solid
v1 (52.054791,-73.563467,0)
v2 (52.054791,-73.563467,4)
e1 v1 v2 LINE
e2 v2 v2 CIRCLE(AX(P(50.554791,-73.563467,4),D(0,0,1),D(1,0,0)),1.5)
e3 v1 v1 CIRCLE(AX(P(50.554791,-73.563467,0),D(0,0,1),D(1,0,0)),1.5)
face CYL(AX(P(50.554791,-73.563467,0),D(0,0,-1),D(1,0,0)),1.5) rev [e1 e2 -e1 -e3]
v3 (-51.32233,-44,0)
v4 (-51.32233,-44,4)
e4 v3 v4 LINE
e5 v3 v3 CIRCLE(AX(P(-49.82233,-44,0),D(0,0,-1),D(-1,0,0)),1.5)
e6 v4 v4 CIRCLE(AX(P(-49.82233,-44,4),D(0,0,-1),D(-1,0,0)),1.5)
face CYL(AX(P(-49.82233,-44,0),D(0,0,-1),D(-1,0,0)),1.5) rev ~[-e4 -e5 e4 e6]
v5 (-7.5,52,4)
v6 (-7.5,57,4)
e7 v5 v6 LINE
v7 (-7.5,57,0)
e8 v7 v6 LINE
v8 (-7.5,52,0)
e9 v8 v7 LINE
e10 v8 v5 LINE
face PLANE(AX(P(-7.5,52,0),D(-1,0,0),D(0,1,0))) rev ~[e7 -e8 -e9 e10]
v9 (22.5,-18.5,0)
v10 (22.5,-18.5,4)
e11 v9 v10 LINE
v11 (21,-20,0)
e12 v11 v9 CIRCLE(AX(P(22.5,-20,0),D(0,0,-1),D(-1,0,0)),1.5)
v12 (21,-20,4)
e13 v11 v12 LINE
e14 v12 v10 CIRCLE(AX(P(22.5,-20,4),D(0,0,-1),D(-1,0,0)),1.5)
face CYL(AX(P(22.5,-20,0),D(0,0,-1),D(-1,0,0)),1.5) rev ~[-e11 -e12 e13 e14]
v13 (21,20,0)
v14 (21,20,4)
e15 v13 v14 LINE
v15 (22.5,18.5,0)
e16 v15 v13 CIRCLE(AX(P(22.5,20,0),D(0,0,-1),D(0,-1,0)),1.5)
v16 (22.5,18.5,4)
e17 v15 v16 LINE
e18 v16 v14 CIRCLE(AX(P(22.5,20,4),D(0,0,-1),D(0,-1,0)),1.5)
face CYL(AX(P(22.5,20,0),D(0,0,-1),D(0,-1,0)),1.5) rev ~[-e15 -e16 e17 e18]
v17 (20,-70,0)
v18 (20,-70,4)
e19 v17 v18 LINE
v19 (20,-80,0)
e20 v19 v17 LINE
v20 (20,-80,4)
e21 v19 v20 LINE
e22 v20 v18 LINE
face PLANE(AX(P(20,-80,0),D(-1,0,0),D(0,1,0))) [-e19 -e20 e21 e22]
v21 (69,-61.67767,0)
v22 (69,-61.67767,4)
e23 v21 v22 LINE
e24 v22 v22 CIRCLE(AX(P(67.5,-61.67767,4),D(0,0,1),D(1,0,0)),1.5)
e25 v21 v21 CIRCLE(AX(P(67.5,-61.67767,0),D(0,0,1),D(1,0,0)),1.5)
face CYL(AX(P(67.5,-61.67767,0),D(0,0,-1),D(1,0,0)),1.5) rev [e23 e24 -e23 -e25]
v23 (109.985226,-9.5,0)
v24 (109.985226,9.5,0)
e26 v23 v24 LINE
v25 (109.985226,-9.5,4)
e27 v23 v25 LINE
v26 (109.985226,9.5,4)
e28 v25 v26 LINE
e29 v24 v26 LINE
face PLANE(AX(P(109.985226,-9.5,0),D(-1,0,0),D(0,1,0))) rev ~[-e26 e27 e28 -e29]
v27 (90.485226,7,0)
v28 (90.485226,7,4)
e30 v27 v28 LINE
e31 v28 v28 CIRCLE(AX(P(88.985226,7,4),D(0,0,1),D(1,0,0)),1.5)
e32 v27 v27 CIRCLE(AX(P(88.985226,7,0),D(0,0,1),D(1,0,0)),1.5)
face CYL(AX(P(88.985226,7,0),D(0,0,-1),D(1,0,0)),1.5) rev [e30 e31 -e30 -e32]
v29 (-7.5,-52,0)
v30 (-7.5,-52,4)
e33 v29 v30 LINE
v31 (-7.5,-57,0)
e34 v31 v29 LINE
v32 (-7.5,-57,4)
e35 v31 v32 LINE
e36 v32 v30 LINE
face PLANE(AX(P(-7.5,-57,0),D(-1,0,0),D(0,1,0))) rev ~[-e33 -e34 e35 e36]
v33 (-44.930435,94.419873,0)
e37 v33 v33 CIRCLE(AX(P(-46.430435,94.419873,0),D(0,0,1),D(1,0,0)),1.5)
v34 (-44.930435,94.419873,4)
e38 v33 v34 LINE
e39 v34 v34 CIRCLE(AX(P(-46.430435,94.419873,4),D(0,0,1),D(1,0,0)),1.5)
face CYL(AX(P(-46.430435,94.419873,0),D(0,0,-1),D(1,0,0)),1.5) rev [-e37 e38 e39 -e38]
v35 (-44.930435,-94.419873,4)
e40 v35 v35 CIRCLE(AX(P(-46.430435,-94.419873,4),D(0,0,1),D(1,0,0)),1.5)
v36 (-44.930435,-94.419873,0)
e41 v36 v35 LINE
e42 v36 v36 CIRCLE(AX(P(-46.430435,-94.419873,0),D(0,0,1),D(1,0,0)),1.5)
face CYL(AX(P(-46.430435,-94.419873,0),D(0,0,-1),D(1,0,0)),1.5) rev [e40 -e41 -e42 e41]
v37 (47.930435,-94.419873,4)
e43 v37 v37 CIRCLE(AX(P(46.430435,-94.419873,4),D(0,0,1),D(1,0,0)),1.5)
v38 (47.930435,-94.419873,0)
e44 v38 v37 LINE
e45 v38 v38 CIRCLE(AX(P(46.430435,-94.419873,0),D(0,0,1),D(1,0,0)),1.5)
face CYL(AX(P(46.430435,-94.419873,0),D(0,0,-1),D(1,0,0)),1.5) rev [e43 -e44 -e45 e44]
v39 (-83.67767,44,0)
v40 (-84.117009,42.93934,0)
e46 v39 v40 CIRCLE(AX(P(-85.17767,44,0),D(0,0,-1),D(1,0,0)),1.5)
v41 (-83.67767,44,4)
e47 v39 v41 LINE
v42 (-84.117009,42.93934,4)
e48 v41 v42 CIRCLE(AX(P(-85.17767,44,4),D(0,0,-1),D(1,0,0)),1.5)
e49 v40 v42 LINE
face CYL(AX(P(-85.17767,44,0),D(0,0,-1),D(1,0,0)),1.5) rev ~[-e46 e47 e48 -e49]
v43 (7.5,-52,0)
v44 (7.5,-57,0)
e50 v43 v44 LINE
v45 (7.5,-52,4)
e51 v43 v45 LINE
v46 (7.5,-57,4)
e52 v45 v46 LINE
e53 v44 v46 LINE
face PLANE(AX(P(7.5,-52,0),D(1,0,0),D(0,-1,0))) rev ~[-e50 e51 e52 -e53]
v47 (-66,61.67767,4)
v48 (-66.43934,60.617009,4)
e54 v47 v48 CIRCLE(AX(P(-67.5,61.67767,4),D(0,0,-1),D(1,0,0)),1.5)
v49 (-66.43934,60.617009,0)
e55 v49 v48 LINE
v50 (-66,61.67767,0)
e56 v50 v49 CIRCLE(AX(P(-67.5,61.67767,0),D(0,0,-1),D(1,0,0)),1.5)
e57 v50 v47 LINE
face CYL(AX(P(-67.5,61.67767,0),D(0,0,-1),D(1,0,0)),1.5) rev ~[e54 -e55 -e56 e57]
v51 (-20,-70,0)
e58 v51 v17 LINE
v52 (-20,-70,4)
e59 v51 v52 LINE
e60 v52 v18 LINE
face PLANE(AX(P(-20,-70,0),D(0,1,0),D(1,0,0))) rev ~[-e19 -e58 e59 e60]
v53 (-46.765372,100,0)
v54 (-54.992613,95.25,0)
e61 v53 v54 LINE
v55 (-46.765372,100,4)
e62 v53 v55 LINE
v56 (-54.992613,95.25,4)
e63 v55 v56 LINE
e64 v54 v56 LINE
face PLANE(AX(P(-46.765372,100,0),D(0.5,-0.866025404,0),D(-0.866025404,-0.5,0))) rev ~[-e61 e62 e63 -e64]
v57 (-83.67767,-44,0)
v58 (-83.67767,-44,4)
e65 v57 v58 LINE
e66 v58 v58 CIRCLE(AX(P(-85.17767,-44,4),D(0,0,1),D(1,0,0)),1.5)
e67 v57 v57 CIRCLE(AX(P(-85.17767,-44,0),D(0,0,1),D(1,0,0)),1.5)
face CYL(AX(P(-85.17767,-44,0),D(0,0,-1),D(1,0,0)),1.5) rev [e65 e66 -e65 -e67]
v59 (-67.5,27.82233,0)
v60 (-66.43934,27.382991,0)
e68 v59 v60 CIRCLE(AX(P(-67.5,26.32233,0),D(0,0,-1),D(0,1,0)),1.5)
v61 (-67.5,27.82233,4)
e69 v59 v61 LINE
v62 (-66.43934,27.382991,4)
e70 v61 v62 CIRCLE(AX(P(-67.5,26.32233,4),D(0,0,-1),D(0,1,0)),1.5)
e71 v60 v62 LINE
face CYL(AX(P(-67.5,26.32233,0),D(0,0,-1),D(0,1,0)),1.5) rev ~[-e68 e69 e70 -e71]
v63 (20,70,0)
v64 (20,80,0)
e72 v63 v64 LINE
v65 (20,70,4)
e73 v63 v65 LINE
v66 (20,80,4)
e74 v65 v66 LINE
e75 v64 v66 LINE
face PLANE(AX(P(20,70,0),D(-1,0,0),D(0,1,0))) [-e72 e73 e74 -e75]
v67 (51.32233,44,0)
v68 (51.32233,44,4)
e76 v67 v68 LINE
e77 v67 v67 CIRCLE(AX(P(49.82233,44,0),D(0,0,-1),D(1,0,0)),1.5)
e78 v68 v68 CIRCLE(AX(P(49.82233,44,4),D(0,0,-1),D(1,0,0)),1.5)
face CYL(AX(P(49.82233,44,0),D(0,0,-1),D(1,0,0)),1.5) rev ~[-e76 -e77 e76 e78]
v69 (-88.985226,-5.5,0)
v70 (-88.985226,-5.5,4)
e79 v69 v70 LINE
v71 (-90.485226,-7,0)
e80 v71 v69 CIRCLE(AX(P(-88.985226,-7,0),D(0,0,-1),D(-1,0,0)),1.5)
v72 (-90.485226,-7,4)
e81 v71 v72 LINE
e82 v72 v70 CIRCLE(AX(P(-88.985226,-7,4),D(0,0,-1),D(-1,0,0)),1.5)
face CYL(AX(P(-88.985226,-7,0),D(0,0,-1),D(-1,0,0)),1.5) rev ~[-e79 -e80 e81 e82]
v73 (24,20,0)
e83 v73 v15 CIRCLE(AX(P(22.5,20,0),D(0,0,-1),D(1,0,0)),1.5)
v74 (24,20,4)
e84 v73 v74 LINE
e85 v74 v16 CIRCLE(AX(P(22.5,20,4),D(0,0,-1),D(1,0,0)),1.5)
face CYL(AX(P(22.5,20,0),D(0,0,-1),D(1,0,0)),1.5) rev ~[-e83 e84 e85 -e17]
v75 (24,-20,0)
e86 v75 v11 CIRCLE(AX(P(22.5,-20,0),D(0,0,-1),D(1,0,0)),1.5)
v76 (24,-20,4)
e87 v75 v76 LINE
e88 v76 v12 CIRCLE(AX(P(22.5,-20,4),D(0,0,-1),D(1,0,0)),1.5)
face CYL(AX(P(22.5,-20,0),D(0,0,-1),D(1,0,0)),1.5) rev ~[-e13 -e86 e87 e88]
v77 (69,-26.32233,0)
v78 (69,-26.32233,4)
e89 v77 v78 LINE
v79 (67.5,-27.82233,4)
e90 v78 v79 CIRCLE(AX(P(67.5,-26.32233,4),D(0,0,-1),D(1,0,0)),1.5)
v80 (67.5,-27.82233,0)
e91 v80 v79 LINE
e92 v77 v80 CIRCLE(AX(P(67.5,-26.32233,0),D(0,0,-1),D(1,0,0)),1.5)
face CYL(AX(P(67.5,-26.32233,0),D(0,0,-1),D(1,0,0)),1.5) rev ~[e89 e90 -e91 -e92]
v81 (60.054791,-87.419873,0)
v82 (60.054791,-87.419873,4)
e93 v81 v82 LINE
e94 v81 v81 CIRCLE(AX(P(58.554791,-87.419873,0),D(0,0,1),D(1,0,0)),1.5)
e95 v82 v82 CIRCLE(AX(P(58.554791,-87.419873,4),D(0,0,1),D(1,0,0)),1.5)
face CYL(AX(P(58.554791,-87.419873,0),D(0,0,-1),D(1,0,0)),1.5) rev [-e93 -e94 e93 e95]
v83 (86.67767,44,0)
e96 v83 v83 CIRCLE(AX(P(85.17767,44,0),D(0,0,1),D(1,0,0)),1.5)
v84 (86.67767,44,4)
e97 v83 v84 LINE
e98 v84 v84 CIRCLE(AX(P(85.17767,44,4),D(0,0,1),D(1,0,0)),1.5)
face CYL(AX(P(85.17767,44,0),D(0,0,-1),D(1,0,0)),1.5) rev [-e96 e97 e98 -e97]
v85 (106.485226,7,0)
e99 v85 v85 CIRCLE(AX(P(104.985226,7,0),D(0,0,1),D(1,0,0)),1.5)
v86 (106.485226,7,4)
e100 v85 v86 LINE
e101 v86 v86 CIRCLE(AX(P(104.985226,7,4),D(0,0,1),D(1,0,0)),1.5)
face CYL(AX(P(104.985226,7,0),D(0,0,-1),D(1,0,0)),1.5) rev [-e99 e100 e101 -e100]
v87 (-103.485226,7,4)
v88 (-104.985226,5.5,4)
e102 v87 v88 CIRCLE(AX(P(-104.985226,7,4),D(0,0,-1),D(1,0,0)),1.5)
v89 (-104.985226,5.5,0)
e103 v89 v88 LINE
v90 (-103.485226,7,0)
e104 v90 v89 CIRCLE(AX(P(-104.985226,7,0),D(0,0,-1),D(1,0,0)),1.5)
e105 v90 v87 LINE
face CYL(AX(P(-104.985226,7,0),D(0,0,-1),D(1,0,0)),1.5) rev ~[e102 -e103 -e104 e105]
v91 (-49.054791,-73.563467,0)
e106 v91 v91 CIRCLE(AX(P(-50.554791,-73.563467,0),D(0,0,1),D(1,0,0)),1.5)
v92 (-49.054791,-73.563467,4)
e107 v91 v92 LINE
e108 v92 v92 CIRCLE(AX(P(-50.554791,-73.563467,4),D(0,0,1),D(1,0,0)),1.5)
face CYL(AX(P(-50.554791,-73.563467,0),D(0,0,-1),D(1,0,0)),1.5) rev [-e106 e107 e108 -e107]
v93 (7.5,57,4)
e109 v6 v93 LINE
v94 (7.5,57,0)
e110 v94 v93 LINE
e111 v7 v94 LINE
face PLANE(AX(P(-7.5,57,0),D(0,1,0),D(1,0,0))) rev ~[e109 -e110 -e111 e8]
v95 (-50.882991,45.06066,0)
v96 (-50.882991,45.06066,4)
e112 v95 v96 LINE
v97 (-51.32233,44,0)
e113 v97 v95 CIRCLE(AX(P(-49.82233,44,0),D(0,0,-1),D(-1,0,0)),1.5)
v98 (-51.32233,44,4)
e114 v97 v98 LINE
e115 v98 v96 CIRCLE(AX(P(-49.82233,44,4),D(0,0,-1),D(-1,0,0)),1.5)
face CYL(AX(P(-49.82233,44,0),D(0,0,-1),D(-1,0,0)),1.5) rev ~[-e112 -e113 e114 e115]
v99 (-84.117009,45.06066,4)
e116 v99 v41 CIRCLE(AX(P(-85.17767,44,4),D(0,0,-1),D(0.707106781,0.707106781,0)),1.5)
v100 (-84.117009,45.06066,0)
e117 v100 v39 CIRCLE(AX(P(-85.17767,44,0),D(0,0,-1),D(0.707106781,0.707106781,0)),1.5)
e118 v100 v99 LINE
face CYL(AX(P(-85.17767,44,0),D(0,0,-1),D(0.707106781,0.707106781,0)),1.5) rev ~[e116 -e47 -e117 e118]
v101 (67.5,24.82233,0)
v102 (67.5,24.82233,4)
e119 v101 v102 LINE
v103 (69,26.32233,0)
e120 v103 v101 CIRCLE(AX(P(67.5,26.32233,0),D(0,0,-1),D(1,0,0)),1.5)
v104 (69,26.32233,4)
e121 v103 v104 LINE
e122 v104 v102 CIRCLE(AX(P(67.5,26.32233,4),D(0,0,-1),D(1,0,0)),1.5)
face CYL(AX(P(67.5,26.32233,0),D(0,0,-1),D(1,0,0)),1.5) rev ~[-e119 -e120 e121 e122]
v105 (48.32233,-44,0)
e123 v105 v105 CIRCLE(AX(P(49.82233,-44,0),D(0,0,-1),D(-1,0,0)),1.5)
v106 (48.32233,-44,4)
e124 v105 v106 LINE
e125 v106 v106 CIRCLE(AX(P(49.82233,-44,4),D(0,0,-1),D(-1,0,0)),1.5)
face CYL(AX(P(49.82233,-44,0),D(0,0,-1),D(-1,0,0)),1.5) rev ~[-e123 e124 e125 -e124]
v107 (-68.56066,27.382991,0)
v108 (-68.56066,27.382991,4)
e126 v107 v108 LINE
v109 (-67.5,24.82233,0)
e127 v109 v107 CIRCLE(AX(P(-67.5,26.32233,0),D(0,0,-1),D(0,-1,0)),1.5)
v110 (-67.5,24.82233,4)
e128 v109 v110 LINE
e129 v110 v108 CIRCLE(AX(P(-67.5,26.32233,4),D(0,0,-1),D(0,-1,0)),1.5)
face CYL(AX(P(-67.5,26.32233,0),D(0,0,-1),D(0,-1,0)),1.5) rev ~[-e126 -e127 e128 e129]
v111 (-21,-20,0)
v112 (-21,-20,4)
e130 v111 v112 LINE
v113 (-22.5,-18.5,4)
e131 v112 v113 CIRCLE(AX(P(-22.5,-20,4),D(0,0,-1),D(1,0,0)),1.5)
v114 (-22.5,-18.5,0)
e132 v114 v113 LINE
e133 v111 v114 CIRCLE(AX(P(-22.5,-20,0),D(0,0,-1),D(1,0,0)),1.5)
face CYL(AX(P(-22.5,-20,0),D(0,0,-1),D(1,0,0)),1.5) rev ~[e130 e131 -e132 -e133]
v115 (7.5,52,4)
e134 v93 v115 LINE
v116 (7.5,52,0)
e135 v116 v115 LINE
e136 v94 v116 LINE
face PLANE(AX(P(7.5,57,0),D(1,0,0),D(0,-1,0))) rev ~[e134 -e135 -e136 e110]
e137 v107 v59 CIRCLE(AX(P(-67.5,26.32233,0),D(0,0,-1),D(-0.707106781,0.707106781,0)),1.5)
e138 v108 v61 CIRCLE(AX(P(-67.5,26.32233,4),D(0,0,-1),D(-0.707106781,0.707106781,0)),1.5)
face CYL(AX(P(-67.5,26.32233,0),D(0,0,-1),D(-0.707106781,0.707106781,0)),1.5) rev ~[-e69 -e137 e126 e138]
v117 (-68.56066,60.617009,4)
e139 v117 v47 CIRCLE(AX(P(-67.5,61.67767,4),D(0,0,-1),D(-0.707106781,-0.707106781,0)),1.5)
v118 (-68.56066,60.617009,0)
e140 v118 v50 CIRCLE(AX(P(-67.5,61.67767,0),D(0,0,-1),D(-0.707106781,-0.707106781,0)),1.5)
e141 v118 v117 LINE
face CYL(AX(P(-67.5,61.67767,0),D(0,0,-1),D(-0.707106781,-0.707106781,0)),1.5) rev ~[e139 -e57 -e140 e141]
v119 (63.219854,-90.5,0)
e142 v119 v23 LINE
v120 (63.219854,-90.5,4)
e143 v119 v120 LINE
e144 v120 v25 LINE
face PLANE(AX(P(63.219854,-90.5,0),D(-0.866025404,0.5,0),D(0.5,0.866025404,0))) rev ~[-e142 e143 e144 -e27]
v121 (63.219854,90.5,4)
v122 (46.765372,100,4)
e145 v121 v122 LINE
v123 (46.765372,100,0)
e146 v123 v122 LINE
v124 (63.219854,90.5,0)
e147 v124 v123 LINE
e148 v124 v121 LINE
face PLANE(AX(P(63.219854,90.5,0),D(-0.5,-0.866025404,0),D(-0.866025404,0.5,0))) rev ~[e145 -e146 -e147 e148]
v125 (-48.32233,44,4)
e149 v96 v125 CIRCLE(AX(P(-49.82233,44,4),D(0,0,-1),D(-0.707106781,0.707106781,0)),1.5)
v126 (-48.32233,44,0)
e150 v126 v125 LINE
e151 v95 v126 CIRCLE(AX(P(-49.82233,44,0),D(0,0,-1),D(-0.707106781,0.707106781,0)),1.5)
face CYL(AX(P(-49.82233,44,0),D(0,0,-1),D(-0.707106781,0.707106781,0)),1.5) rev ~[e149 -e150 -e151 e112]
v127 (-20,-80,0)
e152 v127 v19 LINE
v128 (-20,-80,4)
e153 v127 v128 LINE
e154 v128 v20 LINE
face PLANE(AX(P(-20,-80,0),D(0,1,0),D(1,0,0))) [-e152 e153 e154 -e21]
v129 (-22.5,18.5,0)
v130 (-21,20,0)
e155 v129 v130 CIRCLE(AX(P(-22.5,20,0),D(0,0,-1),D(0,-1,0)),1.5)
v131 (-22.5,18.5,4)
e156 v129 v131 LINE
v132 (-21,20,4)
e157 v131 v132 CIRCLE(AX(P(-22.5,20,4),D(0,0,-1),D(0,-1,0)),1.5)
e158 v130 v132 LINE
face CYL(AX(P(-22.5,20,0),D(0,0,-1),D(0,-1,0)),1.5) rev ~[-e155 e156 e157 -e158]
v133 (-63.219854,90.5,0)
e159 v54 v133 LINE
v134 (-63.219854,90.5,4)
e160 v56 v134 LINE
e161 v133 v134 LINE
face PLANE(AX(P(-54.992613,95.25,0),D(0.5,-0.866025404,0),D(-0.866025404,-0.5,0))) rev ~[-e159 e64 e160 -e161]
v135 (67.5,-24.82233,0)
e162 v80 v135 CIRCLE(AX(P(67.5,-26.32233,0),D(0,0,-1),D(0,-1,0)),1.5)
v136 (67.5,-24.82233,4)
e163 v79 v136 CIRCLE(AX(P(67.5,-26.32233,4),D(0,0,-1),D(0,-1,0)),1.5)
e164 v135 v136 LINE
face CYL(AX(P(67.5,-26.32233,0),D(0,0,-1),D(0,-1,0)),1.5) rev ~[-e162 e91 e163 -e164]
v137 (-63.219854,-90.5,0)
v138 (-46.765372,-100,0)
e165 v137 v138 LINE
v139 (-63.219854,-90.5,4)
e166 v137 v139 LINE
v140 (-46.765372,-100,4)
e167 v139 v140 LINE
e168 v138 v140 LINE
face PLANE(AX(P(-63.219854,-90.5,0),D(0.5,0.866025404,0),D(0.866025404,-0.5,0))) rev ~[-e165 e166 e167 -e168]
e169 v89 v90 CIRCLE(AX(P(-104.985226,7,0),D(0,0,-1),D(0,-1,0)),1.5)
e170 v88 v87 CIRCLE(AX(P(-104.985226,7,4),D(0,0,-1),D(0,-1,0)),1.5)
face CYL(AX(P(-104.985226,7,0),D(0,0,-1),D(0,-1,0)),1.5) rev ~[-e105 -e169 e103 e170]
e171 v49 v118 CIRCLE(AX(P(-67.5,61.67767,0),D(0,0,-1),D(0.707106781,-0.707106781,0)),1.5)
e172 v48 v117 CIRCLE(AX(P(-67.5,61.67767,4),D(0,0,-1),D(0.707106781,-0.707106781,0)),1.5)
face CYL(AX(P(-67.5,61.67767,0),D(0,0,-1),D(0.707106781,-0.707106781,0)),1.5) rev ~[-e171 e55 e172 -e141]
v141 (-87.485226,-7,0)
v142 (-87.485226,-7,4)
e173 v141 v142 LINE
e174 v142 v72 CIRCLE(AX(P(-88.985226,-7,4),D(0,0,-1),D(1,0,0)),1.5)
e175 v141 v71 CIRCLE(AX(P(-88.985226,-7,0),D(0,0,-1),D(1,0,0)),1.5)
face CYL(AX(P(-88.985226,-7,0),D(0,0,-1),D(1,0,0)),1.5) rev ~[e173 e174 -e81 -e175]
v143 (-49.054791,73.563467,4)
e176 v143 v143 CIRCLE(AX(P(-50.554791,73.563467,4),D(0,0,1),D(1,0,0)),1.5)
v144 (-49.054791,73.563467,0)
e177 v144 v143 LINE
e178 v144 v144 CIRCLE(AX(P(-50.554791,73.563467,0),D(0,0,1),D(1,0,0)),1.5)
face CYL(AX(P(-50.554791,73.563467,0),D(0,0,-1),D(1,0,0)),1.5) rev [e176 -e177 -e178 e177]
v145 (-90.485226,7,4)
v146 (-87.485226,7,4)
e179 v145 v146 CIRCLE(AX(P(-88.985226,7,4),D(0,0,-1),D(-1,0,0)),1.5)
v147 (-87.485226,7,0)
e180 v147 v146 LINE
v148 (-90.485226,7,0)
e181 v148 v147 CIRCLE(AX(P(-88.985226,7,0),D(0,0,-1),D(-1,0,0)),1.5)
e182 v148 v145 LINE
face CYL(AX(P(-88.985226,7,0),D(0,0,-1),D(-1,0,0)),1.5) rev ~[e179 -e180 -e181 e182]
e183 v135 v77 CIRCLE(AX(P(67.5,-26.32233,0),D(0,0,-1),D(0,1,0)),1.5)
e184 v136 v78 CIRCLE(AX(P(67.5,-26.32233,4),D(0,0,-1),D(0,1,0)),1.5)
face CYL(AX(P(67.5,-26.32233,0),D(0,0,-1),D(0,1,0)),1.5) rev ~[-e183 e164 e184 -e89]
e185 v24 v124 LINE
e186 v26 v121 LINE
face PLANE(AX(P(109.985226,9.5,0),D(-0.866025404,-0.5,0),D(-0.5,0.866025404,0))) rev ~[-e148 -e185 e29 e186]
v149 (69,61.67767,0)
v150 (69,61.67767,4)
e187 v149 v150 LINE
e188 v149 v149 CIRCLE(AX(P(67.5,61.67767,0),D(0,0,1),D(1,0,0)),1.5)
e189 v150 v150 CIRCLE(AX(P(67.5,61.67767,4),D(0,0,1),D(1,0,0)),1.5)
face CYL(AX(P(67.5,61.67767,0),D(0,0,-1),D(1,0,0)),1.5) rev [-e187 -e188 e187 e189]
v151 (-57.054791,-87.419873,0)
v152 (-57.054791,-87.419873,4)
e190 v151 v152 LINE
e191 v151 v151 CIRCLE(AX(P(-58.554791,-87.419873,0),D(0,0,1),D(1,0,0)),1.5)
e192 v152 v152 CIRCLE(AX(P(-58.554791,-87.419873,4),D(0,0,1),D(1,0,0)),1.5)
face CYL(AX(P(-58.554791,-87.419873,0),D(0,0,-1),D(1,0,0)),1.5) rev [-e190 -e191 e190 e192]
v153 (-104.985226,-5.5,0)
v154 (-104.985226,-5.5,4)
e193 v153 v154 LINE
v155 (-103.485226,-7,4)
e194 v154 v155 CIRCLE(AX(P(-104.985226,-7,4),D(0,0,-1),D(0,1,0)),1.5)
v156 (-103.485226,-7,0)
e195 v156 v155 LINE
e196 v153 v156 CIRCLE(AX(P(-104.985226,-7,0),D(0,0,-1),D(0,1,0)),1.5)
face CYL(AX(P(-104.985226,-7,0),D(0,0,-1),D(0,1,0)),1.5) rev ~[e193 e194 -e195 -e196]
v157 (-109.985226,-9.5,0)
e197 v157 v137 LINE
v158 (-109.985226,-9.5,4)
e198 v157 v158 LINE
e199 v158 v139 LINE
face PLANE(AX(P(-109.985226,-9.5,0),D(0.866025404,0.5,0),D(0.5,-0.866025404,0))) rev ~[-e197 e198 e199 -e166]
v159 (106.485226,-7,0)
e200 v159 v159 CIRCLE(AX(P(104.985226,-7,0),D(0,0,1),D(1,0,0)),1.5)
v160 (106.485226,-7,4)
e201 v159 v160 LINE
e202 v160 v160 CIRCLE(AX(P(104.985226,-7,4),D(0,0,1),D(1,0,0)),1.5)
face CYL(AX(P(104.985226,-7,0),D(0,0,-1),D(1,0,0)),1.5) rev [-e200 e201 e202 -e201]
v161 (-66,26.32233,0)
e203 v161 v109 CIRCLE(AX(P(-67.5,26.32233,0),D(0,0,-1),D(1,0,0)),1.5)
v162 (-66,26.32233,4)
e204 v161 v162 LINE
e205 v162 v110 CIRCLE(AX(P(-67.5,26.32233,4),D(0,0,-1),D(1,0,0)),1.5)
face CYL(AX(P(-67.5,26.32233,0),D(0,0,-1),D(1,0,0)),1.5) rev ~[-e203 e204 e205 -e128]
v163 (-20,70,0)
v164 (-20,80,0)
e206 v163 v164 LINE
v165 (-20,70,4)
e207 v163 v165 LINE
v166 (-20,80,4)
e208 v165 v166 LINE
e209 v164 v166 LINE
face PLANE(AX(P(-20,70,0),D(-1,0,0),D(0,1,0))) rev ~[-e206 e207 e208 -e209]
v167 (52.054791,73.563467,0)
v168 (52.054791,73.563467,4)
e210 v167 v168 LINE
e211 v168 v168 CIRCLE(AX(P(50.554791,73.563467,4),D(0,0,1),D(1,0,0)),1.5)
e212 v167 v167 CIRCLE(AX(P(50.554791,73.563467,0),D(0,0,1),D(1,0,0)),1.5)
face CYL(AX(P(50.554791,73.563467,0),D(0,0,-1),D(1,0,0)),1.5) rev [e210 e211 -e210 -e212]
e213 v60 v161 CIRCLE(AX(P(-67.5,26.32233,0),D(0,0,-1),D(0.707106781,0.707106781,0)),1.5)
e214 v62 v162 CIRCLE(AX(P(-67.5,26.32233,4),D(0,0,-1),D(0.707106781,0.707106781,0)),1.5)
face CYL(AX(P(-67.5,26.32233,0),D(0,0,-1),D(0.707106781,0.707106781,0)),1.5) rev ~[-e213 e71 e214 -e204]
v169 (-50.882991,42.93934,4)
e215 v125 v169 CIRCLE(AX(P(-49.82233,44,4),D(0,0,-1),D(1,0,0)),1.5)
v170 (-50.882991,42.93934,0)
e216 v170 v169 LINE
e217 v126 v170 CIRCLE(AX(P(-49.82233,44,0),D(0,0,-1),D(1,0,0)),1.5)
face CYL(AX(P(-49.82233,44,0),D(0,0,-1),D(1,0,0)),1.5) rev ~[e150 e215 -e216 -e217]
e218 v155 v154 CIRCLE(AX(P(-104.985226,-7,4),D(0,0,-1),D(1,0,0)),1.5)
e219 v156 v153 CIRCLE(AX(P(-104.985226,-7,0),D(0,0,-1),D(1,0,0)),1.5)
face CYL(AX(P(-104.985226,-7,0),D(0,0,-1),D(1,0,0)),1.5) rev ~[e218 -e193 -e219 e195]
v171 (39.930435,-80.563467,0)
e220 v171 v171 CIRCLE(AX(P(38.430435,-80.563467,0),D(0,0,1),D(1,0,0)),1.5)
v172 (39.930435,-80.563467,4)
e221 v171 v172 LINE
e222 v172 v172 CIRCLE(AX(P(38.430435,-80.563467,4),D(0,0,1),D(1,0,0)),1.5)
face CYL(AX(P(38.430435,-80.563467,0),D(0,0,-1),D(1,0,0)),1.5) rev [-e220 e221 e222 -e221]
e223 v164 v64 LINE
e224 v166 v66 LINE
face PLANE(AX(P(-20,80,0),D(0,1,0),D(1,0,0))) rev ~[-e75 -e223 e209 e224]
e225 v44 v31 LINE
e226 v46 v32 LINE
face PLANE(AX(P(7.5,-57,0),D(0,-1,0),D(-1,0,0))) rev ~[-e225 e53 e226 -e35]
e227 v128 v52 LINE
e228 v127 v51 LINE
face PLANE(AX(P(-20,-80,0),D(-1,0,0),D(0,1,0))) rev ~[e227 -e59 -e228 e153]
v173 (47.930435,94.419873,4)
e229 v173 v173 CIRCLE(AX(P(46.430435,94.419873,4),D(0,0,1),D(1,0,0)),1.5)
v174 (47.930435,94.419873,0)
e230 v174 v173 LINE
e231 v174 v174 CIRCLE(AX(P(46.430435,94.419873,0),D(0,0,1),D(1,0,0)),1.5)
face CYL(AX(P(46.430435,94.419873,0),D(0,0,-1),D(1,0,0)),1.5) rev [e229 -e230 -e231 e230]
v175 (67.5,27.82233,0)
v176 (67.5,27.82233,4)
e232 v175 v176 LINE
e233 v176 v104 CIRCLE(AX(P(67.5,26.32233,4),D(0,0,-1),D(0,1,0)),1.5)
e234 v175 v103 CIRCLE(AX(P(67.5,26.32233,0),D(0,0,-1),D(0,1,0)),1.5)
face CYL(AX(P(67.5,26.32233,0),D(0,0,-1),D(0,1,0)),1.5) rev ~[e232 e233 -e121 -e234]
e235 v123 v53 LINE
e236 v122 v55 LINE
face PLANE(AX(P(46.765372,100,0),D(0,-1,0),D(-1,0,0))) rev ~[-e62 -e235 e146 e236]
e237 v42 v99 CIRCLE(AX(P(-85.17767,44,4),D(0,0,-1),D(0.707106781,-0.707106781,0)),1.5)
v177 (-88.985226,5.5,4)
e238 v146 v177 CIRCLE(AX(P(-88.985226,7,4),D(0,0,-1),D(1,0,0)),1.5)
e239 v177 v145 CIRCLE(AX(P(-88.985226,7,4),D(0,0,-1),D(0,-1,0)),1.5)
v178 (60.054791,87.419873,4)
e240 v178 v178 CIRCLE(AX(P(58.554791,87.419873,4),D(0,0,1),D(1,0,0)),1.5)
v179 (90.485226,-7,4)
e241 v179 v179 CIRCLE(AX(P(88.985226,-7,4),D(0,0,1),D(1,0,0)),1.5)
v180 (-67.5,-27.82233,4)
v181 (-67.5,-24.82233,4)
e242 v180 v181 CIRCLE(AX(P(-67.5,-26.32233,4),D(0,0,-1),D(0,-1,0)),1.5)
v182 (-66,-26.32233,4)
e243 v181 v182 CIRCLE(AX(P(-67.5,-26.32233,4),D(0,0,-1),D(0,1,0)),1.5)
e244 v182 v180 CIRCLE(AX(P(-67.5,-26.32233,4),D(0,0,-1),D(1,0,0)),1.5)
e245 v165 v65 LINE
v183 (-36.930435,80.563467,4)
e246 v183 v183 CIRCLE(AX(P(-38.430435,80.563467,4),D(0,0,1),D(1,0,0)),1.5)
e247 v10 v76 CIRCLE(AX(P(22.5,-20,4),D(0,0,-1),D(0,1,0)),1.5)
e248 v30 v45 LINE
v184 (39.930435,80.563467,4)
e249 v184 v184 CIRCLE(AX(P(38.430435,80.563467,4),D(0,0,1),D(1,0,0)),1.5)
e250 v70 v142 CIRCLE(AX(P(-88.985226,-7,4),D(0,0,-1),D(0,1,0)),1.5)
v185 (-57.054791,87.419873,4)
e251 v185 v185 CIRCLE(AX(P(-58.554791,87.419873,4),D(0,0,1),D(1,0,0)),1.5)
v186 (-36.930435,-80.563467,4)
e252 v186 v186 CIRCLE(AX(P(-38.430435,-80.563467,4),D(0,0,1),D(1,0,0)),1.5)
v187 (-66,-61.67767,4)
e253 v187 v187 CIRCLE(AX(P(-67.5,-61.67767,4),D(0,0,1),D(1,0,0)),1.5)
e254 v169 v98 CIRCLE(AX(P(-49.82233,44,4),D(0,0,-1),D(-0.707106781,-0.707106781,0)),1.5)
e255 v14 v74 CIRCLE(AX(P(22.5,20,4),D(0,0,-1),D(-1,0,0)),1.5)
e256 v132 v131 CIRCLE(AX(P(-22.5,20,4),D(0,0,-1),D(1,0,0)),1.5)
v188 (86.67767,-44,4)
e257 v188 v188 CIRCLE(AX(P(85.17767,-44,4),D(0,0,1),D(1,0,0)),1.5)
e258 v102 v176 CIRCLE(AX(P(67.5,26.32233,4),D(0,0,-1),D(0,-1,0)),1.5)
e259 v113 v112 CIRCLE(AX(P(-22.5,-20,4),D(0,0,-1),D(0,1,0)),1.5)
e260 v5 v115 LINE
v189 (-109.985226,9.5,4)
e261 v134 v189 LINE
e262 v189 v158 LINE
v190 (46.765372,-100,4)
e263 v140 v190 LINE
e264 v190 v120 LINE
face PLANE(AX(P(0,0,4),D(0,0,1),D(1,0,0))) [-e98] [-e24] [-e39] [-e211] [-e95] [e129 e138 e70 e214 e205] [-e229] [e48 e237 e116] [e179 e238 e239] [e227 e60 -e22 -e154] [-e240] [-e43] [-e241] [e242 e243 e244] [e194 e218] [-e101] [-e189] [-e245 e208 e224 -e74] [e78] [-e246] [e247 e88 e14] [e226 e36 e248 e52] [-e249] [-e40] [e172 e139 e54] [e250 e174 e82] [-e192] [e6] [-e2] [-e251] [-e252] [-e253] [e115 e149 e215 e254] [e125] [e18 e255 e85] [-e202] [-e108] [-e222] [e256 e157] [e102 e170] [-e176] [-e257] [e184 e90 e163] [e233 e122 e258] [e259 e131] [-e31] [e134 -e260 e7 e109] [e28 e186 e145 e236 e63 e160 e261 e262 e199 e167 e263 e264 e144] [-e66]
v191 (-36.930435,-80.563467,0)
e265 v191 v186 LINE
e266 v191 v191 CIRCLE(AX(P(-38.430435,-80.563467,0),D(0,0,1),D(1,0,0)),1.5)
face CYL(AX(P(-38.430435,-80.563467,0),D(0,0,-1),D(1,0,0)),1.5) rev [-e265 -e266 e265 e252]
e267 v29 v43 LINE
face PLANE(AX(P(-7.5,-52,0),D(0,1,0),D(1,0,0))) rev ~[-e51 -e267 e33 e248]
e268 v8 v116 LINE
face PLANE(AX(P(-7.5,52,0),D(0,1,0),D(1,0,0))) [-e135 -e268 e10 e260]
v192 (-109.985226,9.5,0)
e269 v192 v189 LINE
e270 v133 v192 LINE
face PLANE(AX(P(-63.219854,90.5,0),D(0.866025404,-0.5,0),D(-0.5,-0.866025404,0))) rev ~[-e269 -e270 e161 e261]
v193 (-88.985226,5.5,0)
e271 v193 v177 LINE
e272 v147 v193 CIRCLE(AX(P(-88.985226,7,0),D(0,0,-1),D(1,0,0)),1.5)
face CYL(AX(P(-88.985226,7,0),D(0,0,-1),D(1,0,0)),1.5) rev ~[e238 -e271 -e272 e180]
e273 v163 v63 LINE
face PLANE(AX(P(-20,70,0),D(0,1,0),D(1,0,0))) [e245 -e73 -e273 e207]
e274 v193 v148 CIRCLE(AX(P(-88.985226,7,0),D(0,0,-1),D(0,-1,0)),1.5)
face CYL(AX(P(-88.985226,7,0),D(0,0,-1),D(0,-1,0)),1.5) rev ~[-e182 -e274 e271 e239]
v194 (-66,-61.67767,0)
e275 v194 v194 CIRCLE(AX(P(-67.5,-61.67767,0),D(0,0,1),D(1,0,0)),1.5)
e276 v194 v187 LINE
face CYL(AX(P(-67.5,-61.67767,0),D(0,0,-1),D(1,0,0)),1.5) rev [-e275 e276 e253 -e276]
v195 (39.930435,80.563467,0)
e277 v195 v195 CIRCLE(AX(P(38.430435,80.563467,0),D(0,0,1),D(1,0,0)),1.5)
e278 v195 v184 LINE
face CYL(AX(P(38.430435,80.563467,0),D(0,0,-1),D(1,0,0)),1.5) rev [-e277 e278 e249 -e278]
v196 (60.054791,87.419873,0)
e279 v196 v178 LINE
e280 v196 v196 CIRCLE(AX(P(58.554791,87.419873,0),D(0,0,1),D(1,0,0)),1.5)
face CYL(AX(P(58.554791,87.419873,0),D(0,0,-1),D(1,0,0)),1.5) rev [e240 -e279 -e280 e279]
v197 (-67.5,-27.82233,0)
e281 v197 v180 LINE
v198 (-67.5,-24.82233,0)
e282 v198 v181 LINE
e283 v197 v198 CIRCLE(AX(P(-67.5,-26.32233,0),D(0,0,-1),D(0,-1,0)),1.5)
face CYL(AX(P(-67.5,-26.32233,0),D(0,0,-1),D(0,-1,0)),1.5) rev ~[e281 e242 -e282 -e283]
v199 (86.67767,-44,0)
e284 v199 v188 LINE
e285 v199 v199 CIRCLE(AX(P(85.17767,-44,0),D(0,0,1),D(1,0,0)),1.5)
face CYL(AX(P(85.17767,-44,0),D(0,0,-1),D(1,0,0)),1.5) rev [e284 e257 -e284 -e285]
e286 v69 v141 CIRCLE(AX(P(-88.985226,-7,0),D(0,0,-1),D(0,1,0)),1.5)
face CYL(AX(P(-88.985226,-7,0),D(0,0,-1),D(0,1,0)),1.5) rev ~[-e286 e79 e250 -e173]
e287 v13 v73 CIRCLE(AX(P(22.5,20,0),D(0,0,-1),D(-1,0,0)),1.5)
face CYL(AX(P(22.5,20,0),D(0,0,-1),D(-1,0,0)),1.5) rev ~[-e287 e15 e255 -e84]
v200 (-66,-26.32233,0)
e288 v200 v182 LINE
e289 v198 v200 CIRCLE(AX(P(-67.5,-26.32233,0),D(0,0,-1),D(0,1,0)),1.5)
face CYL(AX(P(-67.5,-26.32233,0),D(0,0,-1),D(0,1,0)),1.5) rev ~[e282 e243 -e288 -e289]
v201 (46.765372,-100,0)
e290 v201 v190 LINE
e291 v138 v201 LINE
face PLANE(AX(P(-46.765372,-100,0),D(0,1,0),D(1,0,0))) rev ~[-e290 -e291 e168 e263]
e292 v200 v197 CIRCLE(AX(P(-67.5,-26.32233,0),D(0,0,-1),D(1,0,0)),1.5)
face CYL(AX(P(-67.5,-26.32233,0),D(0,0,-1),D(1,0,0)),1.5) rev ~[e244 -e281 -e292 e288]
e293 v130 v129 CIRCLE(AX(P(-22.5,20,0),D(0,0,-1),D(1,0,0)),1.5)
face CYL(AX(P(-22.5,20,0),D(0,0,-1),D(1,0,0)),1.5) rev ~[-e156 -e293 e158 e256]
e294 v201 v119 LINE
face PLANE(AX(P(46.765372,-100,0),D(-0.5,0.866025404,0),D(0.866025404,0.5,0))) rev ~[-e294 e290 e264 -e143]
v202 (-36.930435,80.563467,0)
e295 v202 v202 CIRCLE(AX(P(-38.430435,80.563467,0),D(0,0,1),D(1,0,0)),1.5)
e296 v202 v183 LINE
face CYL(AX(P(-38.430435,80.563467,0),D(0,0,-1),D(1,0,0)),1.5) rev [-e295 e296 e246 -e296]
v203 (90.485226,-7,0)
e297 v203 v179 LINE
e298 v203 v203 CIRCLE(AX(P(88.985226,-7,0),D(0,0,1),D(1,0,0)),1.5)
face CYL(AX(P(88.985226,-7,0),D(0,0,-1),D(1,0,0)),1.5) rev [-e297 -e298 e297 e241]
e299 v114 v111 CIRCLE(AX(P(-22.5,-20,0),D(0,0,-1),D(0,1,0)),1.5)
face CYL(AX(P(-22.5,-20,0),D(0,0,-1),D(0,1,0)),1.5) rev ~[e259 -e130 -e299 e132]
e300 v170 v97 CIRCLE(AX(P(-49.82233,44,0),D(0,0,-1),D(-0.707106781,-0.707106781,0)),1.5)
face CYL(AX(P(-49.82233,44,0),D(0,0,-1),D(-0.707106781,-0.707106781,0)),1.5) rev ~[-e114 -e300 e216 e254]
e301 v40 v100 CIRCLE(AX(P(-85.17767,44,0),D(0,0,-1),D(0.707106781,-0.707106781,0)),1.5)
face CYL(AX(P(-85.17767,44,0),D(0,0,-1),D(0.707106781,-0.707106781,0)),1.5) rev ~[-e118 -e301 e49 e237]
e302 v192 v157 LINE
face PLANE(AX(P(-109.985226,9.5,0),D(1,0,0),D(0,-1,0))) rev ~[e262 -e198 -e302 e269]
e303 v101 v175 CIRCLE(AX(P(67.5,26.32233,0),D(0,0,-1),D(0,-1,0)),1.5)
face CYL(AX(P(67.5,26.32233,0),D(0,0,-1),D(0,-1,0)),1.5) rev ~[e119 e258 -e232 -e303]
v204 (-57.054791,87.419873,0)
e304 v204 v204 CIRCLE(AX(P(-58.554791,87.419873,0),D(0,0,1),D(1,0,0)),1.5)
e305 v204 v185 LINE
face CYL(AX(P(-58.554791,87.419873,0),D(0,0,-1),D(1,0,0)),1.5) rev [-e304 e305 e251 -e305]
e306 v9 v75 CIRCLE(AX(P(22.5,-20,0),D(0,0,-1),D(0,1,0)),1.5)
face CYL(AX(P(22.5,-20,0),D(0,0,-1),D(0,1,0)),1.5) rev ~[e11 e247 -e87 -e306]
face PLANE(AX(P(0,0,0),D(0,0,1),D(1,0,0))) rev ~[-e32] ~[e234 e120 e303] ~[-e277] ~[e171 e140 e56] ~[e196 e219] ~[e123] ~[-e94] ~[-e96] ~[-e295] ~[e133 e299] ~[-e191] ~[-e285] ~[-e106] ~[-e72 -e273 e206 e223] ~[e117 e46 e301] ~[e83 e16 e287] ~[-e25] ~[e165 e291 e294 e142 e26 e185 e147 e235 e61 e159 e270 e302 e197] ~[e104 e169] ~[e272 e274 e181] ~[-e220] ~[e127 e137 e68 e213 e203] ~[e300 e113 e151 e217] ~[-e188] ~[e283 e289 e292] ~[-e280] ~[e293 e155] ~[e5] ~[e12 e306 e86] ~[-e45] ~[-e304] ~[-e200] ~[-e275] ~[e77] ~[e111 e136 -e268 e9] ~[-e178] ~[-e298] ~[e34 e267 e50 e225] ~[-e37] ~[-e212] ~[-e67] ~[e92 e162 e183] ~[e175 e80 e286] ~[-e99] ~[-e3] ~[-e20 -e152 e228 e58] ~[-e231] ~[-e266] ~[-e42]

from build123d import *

# Parameters (mm, degrees)
F0_R     = 1.5
F0_W     = 40
F0_H     = 10
F0_W_2   = 15
F0_H_2   = 5
F0_W_3   = 36
F0_H_3   = 40
F0_H_4   = 24
F1_DEPTH = 4


# Not quite as in the source:
# - a feature names something its author has since deleted; it is built from what else it names


with BuildPart() as f1:
    # F0 (on Top) → F1 (new body)
    with BuildSketch(Plane.XY):
        Polygon((-46.7653718044, -100), (46.7653718044, -100), (63.2198544763, -90.5), (109.9852262806, -9.5), (109.9852262806, 9.5), (63.2198544763, 90.5), (46.7653718044, 100), (-46.7653718044, 100), (-54.9926131403, 95.25), (-63.2198544763, 90.5), (-109.9852262806, 9.5), (-109.9852262806, -9.5), (-63.2198544763, -90.5), align=None)
        with Locations((-58.5547909668, -87.4198729811)):
            Circle(F0_R, mode=Mode.SUBTRACT)
        with Locations((-67.5, -61.6776695297)):
            Circle(F0_R, mode=Mode.SUBTRACT)
        with Locations((-46.4304353138, -94.4198729811)):
            Circle(F0_R, mode=Mode.SUBTRACT)
        with Locations((-38.4304353138, -80.5634665205)):
            Circle(F0_R, mode=Mode.SUBTRACT)
        with Locations((-50.5547909668, -73.5634665205)):
            Circle(F0_R, mode=Mode.SUBTRACT)
        with Locations((-85.1776695297, -44)):
            Circle(F0_R, mode=Mode.SUBTRACT)
        with Locations((46.4304353138, -94.4198729811)):
            Circle(F0_R, mode=Mode.SUBTRACT)
        with Locations((38.4304353138, -80.5634665205)):
            Circle(F0_R, mode=Mode.SUBTRACT)
        with Locations((0, -75)):
            Rectangle(F0_W, F0_H, mode=Mode.SUBTRACT)
        with Locations((50.5547909668, -73.5634665205)):
            Circle(F0_R, mode=Mode.SUBTRACT)
        with Locations((58.5547909668, -87.4198729811)):
            Circle(F0_R, mode=Mode.SUBTRACT)
        with Locations((67.5, -61.6776695297)):
            Circle(F0_R, mode=Mode.SUBTRACT)
        with Locations((85.1776695297, -44)):
            Circle(F0_R, mode=Mode.SUBTRACT)
        with Locations((88.9852262806, -7)):
            Circle(F0_R, mode=Mode.SUBTRACT)
        with Locations((104.9852262806, -7)):
            Circle(F0_R, mode=Mode.SUBTRACT)
        with BuildLine():
            Line((-90.4852262806, -7), (-103.4852262806, -7))
            ThreePointArc((-103.4852262806, -7), (-106.0458864524, -8.0606601718), (-104.9852262806, -5.5))
            Line((-104.9852262806, -5.5), (-104.9852262806, 5.5))
            ThreePointArc((-104.9852262806, 5.5), (-106.0458864524, 8.0606601718), (-103.4852262806, 7))
            Line((-103.4852262806, 7), (-90.4852262806, 7))
            ThreePointArc((-90.4852262806, 7), (-88.9852262806, 8.5), (-87.4852262806, 7))
            ThreePointArc((-87.4852262806, 7), (-87.9245661088, 5.9393398282), (-88.9852262806, 5.5))
            Line((-88.9852262806, 5.5), (-88.9852262806, -5.5))
            ThreePointArc((-88.9852262806, -5.5), (-87.9245661088, -5.9393398282), (-87.4852262806, -7))
            ThreePointArc((-87.4852262806, -7), (-88.9852262806, -8.5), (-90.4852262806, -7))
        make_face(mode=Mode.SUBTRACT)
        with BuildLine():
            Line((-48.3223304703, 44), (-18, 44))
            Line((-18, 44), (-18, 52))
            Line((-18, 52), (-7.5, 52))
            Line((-7.5, 52), (-7.5, 57))
            Line((-7.5, 57), (7.5, 57))
            Line((7.5, 57), (7.5, 52))
            Line((7.5, 52), (18, 52))
            Line((18, 52), (18, 44))
            Line((18, 44), (48.3223304703, 44))
            ThreePointArc((48.3223304703, 44), (49.8223304703, 45.5), (51.3223304703, 44))
            Line((51.3223304703, 44), (67.5, 44))
            Line((67.5, 44), (67.5, 27.8223304703))
            ThreePointArc((67.5, 27.8223304703), (68.5606601718, 27.3829906421), (69, 26.3223304703))
            ThreePointArc((69, 26.3223304703), (68.5606601718, 25.2616702986), (67.5, 24.8223304703))
            Line((67.5, 24.8223304703), (67.5, -24.8223304703))
            ThreePointArc((67.5, -24.8223304703), (68.5606601718, -25.2616702986), (69, -26.3223304703))
            ThreePointArc((69, -26.3223304703), (68.5606601718, -27.3829906421), (67.5, -27.8223304703))
            Line((67.5, -27.8223304703), (67.5, -44))
            Line((67.5, -44), (51.3223304703, -44))
            ThreePointArc((51.3223304703, -44), (49.8223304703, -45.5), (48.3223304703, -44))
            Line((48.3223304703, -44), (18, -44))
            Line((18, -44), (18, -52))
            Line((18, -52), (7.5, -52))
            Line((7.5, -52), (7.5, -57))
            Line((7.5, -57), (-7.5, -57))
            Line((-7.5, -57), (-7.5, -52))
            Line((-7.5, -52), (-18, -52))
            Line((-18, -52), (-18, -44))
            Line((-18, -44), (-48.3223304703, -44))
            ThreePointArc((-48.3223304703, -44), (-49.8223304703, -45.5), (-51.3223304703, -44))
            Line((-51.3223304703, -44), (-67.5, -44))
            Line((-67.5, -44), (-67.5, -27.8223304703))
            ThreePointArc((-67.5, -27.8223304703), (-69, -26.3223304703), (-67.5, -24.8223304703))
            Line((-67.5, -24.8223304703), (-67.5, 24.8223304703))
            ThreePointArc((-67.5, 24.8223304703), (-68.8858192988, 25.7483053218), (-68.5606601718, 27.3829906421))
            Line((-68.5606601718, 27.3829906421), (-84.1170093579, 42.9393398282))
            ThreePointArc((-84.1170093579, 42.9393398282), (-86.6776695297, 44), (-84.1170093579, 45.0606601718))
            Line((-84.1170093579, 45.0606601718), (-68.5606601718, 60.6170093579))
            ThreePointArc((-68.5606601718, 60.6170093579), (-68.0740251485, 63.0634888284), (-66, 61.6776695297))
            ThreePointArc((-66, 61.6776695297), (-66.1141807012, 61.1036443811), (-66.4393398282, 60.6170093579))
            Line((-66.4393398282, 60.6170093579), (-50.8829906421, 45.0606601718))
            ThreePointArc((-50.8829906421, 45.0606601718), (-49.2483053218, 45.3858192988), (-48.3223304703, 44))
        make_face(mode=Mode.SUBTRACT)
        with Locations((-58.5547909668, 87.4198729811)):
            Circle(F0_R, mode=Mode.SUBTRACT)
        with Locations((-50.5547909668, 73.5634665205)):
            Circle(F0_R, mode=Mode.SUBTRACT)
        with Locations((-38.4304353138, 80.5634665205)):
            Circle(F0_R, mode=Mode.SUBTRACT)
        with Locations((-46.4304353138, 94.4198729811)):
            Circle(F0_R, mode=Mode.SUBTRACT)
        with Locations((88.9852262806, 7)):
            Circle(F0_R, mode=Mode.SUBTRACT)
        with Locations((104.9852262806, 7)):
            Circle(F0_R, mode=Mode.SUBTRACT)
        with Locations((85.1776695297, 44)):
            Circle(F0_R, mode=Mode.SUBTRACT)
        with Locations((50.5547909668, 73.5634665205)):
            Circle(F0_R, mode=Mode.SUBTRACT)
        with Locations((0, 75)):
            Rectangle(F0_W, F0_H, mode=Mode.SUBTRACT)
        with Locations((38.4304353138, 80.5634665205)):
            Circle(F0_R, mode=Mode.SUBTRACT)
        with Locations((46.4304353138, 94.4198729811)):
            Circle(F0_R, mode=Mode.SUBTRACT)
        with Locations((67.5, 61.6776695297)):
            Circle(F0_R, mode=Mode.SUBTRACT)
        with Locations((58.5547909668, 87.4198729811)):
            Circle(F0_R, mode=Mode.SUBTRACT)
        with BuildLine():
            Line((21, 20), (18, 20))
            Line((18, 20), (18, -20))
            Line((18, -20), (21, -20))
            ThreePointArc((21, -20), (21.4393398282, -18.9393398282), (22.5, -18.5))
            Line((22.5, -18.5), (22.5, 18.5))
            ThreePointArc((22.5, 18.5), (21.4393398282, 18.9393398282), (21, 20))
        make_face()
        Polygon((-18, 52), (-18, 44), (18, 44), (18, 52), (7.5, 52), (7.5, 47), (-7.5, 47), (-7.5, 52), align=None)
        with Locations((0, 49.5)):
            Rectangle(F0_W_2, F0_H_2)
        with BuildLine():
            Line((-18, 20), (-21, 20))
            ThreePointArc((-21, 20), (-21.4393398282, 18.9393398282), (-22.5, 18.5))
            Line((-22.5, 18.5), (-22.5, -18.5))
            ThreePointArc((-22.5, -18.5), (-21.4393398282, -18.9393398282), (-21, -20))
            Line((-21, -20), (-18, -20))
            Line((-18, -20), (-18, 20))
        make_face()
        Polygon((18, -44), (-18, -44), (-18, -52), (-7.5, -52), (-7.5, -47), (7.5, -47), (7.5, -52), (18, -52), align=None)
        Rectangle(F0_W_3, F0_H_3)
        with Locations((0, -49.5)):
            Rectangle(F0_W_2, F0_H_2)
        with BuildLine():
            ThreePointArc((-22.5, 18.5), (-23.5606601718, 21.0606601718), (-21, 20))
            Line((-21, 20), (-18, 20))
            Line((-18, 20), (-18, 44))
            Line((-18, 44), (-48.3223304703, 44))
            ThreePointArc((-48.3223304703, 44), (-49.2483053218, 42.6141807012), (-50.8829906421, 42.9393398282))
            Line((-50.8829906421, 42.9393398282), (-66.4393398282, 27.3829906421))
            ThreePointArc((-66.4393398282, 27.3829906421), (-66.1141807012, 26.8963556189), (-66, 26.3223304703))
            ThreePointArc((-66, 26.3223304703), (-66.4393398282, 25.2616702986), (-67.5, 24.8223304703))
            Line((-67.5, 24.8223304703), (-67.5, -24.8223304703))
            ThreePointArc((-67.5, -24.8223304703), (-66.4393398282, -25.2616702986), (-66, -26.3223304703))
            ThreePointArc((-66, -26.3223304703), (-66.4393398282, -27.3829906421), (-67.5, -27.8223304703))
            Line((-67.5, -27.8223304703), (-67.5, -44))
            Line((-67.5, -44), (-51.3223304703, -44))
            ThreePointArc((-51.3223304703, -44), (-49.8223304703, -42.5), (-48.3223304703, -44))
            Line((-48.3223304703, -44), (-18, -44))
            Line((-18, -44), (-18, -20))
            Line((-18, -20), (-21, -20))
            ThreePointArc((-21, -20), (-23.5606601718, -21.0606601718), (-22.5, -18.5))
            Line((-22.5, -18.5), (-22.5, 18.5))
        make_face()
        with BuildLine():
            ThreePointArc((-51.3223304703, 44), (-51.2081497691, 44.5740251485), (-50.8829906421, 45.0606601718))
            Line((-50.8829906421, 45.0606601718), (-66.4393398282, 60.6170093579))
            ThreePointArc((-66.4393398282, 60.6170093579), (-67.5, 60.1776695297), (-68.5606601718, 60.6170093579))
            Line((-68.5606601718, 60.6170093579), (-84.1170093579, 45.0606601718))
            ThreePointArc((-84.1170093579, 45.0606601718), (-83.7918502309, 44.5740251485), (-83.6776695297, 44))
            ThreePointArc((-83.6776695297, 44), (-83.7918502309, 43.4259748515), (-84.1170093579, 42.9393398282))
            Line((-84.1170093579, 42.9393398282), (-68.5606601718, 27.3829906421))
            ThreePointArc((-68.5606601718, 27.3829906421), (-68.0740251485, 27.7081497691), (-67.5, 27.8223304703))
            Line((-67.5, 27.8223304703), (-67.5, 44))
            Line((-67.5, 44), (-51.3223304703, 44))
        make_face()
        with BuildLine():
            Line((-66.4393398282, 27.3829906421), (-50.8829906421, 42.9393398282))
            ThreePointArc((-50.8829906421, 42.9393398282), (-51.2081497691, 43.4259748515), (-51.3223304703, 44))
            Line((-51.3223304703, 44), (-67.5, 44))
            Line((-67.5, 44), (-67.5, 27.8223304703))
            ThreePointArc((-67.5, 27.8223304703), (-66.9259748515, 27.7081497691), (-66.4393398282, 27.3829906421))
        make_face()
        with BuildLine():
            Line((18, 44), (18, 20))
            Line((18, 20), (21, 20))
            ThreePointArc((21, 20), (22.5, 21.5), (24, 20))
            ThreePointArc((24, 20), (23.5606601718, 18.9393398282), (22.5, 18.5))
            Line((22.5, 18.5), (22.5, -18.5))
            ThreePointArc((22.5, -18.5), (23.5606601718, -18.9393398282), (24, -20))
            ThreePointArc((24, -20), (22.5, -21.5), (21, -20))
            Line((21, -20), (18, -20))
            Line((18, -20), (18, -44))
            Line((18, -44), (48.3223304703, -44))
            ThreePointArc((48.3223304703, -44), (49.8223304703, -42.5), (51.3223304703, -44))
            Line((51.3223304703, -44), (67.5, -44))
            Line((67.5, -44), (67.5, -27.8223304703))
            ThreePointArc((67.5, -27.8223304703), (66, -26.3223304703), (67.5, -24.8223304703))
            Line((67.5, -24.8223304703), (67.5, 24.8223304703))
            ThreePointArc((67.5, 24.8223304703), (66, 26.3223304703), (67.5, 27.8223304703))
            Line((67.5, 27.8223304703), (67.5, 44))
            Line((67.5, 44), (51.3223304703, 44))
            ThreePointArc((51.3223304703, 44), (49.8223304703, 42.5), (48.3223304703, 44))
            Line((48.3223304703, 44), (18, 44))
        make_face()
        with Locations((0, 32)):
            Rectangle(F0_W_3, F0_H_4)
        with Locations((0, -32)):
            Rectangle(F0_W_3, F0_H_4)
        with BuildLine():
            ThreePointArc((-104.9852262806, -5.5), (-103.9245661088, -5.9393398282), (-103.4852262806, -7))
            Line((-103.4852262806, -7), (-90.4852262806, -7))
            ThreePointArc((-90.4852262806, -7), (-90.0458864524, -5.9393398282), (-88.9852262806, -5.5))
            Line((-88.9852262806, -5.5), (-88.9852262806, 5.5))
            ThreePointArc((-88.9852262806, 5.5), (-90.0458864524, 5.9393398282), (-90.4852262806, 7))
            Line((-90.4852262806, 7), (-103.4852262806, 7))
            ThreePointArc((-103.4852262806, 7), (-103.9245661088, 5.9393398282), (-104.9852262806, 5.5))
            Line((-104.9852262806, 5.5), (-104.9852262806, -5.5))
        make_face()
    extrude(amount=F1_DEPTH)


solid = f1.part
